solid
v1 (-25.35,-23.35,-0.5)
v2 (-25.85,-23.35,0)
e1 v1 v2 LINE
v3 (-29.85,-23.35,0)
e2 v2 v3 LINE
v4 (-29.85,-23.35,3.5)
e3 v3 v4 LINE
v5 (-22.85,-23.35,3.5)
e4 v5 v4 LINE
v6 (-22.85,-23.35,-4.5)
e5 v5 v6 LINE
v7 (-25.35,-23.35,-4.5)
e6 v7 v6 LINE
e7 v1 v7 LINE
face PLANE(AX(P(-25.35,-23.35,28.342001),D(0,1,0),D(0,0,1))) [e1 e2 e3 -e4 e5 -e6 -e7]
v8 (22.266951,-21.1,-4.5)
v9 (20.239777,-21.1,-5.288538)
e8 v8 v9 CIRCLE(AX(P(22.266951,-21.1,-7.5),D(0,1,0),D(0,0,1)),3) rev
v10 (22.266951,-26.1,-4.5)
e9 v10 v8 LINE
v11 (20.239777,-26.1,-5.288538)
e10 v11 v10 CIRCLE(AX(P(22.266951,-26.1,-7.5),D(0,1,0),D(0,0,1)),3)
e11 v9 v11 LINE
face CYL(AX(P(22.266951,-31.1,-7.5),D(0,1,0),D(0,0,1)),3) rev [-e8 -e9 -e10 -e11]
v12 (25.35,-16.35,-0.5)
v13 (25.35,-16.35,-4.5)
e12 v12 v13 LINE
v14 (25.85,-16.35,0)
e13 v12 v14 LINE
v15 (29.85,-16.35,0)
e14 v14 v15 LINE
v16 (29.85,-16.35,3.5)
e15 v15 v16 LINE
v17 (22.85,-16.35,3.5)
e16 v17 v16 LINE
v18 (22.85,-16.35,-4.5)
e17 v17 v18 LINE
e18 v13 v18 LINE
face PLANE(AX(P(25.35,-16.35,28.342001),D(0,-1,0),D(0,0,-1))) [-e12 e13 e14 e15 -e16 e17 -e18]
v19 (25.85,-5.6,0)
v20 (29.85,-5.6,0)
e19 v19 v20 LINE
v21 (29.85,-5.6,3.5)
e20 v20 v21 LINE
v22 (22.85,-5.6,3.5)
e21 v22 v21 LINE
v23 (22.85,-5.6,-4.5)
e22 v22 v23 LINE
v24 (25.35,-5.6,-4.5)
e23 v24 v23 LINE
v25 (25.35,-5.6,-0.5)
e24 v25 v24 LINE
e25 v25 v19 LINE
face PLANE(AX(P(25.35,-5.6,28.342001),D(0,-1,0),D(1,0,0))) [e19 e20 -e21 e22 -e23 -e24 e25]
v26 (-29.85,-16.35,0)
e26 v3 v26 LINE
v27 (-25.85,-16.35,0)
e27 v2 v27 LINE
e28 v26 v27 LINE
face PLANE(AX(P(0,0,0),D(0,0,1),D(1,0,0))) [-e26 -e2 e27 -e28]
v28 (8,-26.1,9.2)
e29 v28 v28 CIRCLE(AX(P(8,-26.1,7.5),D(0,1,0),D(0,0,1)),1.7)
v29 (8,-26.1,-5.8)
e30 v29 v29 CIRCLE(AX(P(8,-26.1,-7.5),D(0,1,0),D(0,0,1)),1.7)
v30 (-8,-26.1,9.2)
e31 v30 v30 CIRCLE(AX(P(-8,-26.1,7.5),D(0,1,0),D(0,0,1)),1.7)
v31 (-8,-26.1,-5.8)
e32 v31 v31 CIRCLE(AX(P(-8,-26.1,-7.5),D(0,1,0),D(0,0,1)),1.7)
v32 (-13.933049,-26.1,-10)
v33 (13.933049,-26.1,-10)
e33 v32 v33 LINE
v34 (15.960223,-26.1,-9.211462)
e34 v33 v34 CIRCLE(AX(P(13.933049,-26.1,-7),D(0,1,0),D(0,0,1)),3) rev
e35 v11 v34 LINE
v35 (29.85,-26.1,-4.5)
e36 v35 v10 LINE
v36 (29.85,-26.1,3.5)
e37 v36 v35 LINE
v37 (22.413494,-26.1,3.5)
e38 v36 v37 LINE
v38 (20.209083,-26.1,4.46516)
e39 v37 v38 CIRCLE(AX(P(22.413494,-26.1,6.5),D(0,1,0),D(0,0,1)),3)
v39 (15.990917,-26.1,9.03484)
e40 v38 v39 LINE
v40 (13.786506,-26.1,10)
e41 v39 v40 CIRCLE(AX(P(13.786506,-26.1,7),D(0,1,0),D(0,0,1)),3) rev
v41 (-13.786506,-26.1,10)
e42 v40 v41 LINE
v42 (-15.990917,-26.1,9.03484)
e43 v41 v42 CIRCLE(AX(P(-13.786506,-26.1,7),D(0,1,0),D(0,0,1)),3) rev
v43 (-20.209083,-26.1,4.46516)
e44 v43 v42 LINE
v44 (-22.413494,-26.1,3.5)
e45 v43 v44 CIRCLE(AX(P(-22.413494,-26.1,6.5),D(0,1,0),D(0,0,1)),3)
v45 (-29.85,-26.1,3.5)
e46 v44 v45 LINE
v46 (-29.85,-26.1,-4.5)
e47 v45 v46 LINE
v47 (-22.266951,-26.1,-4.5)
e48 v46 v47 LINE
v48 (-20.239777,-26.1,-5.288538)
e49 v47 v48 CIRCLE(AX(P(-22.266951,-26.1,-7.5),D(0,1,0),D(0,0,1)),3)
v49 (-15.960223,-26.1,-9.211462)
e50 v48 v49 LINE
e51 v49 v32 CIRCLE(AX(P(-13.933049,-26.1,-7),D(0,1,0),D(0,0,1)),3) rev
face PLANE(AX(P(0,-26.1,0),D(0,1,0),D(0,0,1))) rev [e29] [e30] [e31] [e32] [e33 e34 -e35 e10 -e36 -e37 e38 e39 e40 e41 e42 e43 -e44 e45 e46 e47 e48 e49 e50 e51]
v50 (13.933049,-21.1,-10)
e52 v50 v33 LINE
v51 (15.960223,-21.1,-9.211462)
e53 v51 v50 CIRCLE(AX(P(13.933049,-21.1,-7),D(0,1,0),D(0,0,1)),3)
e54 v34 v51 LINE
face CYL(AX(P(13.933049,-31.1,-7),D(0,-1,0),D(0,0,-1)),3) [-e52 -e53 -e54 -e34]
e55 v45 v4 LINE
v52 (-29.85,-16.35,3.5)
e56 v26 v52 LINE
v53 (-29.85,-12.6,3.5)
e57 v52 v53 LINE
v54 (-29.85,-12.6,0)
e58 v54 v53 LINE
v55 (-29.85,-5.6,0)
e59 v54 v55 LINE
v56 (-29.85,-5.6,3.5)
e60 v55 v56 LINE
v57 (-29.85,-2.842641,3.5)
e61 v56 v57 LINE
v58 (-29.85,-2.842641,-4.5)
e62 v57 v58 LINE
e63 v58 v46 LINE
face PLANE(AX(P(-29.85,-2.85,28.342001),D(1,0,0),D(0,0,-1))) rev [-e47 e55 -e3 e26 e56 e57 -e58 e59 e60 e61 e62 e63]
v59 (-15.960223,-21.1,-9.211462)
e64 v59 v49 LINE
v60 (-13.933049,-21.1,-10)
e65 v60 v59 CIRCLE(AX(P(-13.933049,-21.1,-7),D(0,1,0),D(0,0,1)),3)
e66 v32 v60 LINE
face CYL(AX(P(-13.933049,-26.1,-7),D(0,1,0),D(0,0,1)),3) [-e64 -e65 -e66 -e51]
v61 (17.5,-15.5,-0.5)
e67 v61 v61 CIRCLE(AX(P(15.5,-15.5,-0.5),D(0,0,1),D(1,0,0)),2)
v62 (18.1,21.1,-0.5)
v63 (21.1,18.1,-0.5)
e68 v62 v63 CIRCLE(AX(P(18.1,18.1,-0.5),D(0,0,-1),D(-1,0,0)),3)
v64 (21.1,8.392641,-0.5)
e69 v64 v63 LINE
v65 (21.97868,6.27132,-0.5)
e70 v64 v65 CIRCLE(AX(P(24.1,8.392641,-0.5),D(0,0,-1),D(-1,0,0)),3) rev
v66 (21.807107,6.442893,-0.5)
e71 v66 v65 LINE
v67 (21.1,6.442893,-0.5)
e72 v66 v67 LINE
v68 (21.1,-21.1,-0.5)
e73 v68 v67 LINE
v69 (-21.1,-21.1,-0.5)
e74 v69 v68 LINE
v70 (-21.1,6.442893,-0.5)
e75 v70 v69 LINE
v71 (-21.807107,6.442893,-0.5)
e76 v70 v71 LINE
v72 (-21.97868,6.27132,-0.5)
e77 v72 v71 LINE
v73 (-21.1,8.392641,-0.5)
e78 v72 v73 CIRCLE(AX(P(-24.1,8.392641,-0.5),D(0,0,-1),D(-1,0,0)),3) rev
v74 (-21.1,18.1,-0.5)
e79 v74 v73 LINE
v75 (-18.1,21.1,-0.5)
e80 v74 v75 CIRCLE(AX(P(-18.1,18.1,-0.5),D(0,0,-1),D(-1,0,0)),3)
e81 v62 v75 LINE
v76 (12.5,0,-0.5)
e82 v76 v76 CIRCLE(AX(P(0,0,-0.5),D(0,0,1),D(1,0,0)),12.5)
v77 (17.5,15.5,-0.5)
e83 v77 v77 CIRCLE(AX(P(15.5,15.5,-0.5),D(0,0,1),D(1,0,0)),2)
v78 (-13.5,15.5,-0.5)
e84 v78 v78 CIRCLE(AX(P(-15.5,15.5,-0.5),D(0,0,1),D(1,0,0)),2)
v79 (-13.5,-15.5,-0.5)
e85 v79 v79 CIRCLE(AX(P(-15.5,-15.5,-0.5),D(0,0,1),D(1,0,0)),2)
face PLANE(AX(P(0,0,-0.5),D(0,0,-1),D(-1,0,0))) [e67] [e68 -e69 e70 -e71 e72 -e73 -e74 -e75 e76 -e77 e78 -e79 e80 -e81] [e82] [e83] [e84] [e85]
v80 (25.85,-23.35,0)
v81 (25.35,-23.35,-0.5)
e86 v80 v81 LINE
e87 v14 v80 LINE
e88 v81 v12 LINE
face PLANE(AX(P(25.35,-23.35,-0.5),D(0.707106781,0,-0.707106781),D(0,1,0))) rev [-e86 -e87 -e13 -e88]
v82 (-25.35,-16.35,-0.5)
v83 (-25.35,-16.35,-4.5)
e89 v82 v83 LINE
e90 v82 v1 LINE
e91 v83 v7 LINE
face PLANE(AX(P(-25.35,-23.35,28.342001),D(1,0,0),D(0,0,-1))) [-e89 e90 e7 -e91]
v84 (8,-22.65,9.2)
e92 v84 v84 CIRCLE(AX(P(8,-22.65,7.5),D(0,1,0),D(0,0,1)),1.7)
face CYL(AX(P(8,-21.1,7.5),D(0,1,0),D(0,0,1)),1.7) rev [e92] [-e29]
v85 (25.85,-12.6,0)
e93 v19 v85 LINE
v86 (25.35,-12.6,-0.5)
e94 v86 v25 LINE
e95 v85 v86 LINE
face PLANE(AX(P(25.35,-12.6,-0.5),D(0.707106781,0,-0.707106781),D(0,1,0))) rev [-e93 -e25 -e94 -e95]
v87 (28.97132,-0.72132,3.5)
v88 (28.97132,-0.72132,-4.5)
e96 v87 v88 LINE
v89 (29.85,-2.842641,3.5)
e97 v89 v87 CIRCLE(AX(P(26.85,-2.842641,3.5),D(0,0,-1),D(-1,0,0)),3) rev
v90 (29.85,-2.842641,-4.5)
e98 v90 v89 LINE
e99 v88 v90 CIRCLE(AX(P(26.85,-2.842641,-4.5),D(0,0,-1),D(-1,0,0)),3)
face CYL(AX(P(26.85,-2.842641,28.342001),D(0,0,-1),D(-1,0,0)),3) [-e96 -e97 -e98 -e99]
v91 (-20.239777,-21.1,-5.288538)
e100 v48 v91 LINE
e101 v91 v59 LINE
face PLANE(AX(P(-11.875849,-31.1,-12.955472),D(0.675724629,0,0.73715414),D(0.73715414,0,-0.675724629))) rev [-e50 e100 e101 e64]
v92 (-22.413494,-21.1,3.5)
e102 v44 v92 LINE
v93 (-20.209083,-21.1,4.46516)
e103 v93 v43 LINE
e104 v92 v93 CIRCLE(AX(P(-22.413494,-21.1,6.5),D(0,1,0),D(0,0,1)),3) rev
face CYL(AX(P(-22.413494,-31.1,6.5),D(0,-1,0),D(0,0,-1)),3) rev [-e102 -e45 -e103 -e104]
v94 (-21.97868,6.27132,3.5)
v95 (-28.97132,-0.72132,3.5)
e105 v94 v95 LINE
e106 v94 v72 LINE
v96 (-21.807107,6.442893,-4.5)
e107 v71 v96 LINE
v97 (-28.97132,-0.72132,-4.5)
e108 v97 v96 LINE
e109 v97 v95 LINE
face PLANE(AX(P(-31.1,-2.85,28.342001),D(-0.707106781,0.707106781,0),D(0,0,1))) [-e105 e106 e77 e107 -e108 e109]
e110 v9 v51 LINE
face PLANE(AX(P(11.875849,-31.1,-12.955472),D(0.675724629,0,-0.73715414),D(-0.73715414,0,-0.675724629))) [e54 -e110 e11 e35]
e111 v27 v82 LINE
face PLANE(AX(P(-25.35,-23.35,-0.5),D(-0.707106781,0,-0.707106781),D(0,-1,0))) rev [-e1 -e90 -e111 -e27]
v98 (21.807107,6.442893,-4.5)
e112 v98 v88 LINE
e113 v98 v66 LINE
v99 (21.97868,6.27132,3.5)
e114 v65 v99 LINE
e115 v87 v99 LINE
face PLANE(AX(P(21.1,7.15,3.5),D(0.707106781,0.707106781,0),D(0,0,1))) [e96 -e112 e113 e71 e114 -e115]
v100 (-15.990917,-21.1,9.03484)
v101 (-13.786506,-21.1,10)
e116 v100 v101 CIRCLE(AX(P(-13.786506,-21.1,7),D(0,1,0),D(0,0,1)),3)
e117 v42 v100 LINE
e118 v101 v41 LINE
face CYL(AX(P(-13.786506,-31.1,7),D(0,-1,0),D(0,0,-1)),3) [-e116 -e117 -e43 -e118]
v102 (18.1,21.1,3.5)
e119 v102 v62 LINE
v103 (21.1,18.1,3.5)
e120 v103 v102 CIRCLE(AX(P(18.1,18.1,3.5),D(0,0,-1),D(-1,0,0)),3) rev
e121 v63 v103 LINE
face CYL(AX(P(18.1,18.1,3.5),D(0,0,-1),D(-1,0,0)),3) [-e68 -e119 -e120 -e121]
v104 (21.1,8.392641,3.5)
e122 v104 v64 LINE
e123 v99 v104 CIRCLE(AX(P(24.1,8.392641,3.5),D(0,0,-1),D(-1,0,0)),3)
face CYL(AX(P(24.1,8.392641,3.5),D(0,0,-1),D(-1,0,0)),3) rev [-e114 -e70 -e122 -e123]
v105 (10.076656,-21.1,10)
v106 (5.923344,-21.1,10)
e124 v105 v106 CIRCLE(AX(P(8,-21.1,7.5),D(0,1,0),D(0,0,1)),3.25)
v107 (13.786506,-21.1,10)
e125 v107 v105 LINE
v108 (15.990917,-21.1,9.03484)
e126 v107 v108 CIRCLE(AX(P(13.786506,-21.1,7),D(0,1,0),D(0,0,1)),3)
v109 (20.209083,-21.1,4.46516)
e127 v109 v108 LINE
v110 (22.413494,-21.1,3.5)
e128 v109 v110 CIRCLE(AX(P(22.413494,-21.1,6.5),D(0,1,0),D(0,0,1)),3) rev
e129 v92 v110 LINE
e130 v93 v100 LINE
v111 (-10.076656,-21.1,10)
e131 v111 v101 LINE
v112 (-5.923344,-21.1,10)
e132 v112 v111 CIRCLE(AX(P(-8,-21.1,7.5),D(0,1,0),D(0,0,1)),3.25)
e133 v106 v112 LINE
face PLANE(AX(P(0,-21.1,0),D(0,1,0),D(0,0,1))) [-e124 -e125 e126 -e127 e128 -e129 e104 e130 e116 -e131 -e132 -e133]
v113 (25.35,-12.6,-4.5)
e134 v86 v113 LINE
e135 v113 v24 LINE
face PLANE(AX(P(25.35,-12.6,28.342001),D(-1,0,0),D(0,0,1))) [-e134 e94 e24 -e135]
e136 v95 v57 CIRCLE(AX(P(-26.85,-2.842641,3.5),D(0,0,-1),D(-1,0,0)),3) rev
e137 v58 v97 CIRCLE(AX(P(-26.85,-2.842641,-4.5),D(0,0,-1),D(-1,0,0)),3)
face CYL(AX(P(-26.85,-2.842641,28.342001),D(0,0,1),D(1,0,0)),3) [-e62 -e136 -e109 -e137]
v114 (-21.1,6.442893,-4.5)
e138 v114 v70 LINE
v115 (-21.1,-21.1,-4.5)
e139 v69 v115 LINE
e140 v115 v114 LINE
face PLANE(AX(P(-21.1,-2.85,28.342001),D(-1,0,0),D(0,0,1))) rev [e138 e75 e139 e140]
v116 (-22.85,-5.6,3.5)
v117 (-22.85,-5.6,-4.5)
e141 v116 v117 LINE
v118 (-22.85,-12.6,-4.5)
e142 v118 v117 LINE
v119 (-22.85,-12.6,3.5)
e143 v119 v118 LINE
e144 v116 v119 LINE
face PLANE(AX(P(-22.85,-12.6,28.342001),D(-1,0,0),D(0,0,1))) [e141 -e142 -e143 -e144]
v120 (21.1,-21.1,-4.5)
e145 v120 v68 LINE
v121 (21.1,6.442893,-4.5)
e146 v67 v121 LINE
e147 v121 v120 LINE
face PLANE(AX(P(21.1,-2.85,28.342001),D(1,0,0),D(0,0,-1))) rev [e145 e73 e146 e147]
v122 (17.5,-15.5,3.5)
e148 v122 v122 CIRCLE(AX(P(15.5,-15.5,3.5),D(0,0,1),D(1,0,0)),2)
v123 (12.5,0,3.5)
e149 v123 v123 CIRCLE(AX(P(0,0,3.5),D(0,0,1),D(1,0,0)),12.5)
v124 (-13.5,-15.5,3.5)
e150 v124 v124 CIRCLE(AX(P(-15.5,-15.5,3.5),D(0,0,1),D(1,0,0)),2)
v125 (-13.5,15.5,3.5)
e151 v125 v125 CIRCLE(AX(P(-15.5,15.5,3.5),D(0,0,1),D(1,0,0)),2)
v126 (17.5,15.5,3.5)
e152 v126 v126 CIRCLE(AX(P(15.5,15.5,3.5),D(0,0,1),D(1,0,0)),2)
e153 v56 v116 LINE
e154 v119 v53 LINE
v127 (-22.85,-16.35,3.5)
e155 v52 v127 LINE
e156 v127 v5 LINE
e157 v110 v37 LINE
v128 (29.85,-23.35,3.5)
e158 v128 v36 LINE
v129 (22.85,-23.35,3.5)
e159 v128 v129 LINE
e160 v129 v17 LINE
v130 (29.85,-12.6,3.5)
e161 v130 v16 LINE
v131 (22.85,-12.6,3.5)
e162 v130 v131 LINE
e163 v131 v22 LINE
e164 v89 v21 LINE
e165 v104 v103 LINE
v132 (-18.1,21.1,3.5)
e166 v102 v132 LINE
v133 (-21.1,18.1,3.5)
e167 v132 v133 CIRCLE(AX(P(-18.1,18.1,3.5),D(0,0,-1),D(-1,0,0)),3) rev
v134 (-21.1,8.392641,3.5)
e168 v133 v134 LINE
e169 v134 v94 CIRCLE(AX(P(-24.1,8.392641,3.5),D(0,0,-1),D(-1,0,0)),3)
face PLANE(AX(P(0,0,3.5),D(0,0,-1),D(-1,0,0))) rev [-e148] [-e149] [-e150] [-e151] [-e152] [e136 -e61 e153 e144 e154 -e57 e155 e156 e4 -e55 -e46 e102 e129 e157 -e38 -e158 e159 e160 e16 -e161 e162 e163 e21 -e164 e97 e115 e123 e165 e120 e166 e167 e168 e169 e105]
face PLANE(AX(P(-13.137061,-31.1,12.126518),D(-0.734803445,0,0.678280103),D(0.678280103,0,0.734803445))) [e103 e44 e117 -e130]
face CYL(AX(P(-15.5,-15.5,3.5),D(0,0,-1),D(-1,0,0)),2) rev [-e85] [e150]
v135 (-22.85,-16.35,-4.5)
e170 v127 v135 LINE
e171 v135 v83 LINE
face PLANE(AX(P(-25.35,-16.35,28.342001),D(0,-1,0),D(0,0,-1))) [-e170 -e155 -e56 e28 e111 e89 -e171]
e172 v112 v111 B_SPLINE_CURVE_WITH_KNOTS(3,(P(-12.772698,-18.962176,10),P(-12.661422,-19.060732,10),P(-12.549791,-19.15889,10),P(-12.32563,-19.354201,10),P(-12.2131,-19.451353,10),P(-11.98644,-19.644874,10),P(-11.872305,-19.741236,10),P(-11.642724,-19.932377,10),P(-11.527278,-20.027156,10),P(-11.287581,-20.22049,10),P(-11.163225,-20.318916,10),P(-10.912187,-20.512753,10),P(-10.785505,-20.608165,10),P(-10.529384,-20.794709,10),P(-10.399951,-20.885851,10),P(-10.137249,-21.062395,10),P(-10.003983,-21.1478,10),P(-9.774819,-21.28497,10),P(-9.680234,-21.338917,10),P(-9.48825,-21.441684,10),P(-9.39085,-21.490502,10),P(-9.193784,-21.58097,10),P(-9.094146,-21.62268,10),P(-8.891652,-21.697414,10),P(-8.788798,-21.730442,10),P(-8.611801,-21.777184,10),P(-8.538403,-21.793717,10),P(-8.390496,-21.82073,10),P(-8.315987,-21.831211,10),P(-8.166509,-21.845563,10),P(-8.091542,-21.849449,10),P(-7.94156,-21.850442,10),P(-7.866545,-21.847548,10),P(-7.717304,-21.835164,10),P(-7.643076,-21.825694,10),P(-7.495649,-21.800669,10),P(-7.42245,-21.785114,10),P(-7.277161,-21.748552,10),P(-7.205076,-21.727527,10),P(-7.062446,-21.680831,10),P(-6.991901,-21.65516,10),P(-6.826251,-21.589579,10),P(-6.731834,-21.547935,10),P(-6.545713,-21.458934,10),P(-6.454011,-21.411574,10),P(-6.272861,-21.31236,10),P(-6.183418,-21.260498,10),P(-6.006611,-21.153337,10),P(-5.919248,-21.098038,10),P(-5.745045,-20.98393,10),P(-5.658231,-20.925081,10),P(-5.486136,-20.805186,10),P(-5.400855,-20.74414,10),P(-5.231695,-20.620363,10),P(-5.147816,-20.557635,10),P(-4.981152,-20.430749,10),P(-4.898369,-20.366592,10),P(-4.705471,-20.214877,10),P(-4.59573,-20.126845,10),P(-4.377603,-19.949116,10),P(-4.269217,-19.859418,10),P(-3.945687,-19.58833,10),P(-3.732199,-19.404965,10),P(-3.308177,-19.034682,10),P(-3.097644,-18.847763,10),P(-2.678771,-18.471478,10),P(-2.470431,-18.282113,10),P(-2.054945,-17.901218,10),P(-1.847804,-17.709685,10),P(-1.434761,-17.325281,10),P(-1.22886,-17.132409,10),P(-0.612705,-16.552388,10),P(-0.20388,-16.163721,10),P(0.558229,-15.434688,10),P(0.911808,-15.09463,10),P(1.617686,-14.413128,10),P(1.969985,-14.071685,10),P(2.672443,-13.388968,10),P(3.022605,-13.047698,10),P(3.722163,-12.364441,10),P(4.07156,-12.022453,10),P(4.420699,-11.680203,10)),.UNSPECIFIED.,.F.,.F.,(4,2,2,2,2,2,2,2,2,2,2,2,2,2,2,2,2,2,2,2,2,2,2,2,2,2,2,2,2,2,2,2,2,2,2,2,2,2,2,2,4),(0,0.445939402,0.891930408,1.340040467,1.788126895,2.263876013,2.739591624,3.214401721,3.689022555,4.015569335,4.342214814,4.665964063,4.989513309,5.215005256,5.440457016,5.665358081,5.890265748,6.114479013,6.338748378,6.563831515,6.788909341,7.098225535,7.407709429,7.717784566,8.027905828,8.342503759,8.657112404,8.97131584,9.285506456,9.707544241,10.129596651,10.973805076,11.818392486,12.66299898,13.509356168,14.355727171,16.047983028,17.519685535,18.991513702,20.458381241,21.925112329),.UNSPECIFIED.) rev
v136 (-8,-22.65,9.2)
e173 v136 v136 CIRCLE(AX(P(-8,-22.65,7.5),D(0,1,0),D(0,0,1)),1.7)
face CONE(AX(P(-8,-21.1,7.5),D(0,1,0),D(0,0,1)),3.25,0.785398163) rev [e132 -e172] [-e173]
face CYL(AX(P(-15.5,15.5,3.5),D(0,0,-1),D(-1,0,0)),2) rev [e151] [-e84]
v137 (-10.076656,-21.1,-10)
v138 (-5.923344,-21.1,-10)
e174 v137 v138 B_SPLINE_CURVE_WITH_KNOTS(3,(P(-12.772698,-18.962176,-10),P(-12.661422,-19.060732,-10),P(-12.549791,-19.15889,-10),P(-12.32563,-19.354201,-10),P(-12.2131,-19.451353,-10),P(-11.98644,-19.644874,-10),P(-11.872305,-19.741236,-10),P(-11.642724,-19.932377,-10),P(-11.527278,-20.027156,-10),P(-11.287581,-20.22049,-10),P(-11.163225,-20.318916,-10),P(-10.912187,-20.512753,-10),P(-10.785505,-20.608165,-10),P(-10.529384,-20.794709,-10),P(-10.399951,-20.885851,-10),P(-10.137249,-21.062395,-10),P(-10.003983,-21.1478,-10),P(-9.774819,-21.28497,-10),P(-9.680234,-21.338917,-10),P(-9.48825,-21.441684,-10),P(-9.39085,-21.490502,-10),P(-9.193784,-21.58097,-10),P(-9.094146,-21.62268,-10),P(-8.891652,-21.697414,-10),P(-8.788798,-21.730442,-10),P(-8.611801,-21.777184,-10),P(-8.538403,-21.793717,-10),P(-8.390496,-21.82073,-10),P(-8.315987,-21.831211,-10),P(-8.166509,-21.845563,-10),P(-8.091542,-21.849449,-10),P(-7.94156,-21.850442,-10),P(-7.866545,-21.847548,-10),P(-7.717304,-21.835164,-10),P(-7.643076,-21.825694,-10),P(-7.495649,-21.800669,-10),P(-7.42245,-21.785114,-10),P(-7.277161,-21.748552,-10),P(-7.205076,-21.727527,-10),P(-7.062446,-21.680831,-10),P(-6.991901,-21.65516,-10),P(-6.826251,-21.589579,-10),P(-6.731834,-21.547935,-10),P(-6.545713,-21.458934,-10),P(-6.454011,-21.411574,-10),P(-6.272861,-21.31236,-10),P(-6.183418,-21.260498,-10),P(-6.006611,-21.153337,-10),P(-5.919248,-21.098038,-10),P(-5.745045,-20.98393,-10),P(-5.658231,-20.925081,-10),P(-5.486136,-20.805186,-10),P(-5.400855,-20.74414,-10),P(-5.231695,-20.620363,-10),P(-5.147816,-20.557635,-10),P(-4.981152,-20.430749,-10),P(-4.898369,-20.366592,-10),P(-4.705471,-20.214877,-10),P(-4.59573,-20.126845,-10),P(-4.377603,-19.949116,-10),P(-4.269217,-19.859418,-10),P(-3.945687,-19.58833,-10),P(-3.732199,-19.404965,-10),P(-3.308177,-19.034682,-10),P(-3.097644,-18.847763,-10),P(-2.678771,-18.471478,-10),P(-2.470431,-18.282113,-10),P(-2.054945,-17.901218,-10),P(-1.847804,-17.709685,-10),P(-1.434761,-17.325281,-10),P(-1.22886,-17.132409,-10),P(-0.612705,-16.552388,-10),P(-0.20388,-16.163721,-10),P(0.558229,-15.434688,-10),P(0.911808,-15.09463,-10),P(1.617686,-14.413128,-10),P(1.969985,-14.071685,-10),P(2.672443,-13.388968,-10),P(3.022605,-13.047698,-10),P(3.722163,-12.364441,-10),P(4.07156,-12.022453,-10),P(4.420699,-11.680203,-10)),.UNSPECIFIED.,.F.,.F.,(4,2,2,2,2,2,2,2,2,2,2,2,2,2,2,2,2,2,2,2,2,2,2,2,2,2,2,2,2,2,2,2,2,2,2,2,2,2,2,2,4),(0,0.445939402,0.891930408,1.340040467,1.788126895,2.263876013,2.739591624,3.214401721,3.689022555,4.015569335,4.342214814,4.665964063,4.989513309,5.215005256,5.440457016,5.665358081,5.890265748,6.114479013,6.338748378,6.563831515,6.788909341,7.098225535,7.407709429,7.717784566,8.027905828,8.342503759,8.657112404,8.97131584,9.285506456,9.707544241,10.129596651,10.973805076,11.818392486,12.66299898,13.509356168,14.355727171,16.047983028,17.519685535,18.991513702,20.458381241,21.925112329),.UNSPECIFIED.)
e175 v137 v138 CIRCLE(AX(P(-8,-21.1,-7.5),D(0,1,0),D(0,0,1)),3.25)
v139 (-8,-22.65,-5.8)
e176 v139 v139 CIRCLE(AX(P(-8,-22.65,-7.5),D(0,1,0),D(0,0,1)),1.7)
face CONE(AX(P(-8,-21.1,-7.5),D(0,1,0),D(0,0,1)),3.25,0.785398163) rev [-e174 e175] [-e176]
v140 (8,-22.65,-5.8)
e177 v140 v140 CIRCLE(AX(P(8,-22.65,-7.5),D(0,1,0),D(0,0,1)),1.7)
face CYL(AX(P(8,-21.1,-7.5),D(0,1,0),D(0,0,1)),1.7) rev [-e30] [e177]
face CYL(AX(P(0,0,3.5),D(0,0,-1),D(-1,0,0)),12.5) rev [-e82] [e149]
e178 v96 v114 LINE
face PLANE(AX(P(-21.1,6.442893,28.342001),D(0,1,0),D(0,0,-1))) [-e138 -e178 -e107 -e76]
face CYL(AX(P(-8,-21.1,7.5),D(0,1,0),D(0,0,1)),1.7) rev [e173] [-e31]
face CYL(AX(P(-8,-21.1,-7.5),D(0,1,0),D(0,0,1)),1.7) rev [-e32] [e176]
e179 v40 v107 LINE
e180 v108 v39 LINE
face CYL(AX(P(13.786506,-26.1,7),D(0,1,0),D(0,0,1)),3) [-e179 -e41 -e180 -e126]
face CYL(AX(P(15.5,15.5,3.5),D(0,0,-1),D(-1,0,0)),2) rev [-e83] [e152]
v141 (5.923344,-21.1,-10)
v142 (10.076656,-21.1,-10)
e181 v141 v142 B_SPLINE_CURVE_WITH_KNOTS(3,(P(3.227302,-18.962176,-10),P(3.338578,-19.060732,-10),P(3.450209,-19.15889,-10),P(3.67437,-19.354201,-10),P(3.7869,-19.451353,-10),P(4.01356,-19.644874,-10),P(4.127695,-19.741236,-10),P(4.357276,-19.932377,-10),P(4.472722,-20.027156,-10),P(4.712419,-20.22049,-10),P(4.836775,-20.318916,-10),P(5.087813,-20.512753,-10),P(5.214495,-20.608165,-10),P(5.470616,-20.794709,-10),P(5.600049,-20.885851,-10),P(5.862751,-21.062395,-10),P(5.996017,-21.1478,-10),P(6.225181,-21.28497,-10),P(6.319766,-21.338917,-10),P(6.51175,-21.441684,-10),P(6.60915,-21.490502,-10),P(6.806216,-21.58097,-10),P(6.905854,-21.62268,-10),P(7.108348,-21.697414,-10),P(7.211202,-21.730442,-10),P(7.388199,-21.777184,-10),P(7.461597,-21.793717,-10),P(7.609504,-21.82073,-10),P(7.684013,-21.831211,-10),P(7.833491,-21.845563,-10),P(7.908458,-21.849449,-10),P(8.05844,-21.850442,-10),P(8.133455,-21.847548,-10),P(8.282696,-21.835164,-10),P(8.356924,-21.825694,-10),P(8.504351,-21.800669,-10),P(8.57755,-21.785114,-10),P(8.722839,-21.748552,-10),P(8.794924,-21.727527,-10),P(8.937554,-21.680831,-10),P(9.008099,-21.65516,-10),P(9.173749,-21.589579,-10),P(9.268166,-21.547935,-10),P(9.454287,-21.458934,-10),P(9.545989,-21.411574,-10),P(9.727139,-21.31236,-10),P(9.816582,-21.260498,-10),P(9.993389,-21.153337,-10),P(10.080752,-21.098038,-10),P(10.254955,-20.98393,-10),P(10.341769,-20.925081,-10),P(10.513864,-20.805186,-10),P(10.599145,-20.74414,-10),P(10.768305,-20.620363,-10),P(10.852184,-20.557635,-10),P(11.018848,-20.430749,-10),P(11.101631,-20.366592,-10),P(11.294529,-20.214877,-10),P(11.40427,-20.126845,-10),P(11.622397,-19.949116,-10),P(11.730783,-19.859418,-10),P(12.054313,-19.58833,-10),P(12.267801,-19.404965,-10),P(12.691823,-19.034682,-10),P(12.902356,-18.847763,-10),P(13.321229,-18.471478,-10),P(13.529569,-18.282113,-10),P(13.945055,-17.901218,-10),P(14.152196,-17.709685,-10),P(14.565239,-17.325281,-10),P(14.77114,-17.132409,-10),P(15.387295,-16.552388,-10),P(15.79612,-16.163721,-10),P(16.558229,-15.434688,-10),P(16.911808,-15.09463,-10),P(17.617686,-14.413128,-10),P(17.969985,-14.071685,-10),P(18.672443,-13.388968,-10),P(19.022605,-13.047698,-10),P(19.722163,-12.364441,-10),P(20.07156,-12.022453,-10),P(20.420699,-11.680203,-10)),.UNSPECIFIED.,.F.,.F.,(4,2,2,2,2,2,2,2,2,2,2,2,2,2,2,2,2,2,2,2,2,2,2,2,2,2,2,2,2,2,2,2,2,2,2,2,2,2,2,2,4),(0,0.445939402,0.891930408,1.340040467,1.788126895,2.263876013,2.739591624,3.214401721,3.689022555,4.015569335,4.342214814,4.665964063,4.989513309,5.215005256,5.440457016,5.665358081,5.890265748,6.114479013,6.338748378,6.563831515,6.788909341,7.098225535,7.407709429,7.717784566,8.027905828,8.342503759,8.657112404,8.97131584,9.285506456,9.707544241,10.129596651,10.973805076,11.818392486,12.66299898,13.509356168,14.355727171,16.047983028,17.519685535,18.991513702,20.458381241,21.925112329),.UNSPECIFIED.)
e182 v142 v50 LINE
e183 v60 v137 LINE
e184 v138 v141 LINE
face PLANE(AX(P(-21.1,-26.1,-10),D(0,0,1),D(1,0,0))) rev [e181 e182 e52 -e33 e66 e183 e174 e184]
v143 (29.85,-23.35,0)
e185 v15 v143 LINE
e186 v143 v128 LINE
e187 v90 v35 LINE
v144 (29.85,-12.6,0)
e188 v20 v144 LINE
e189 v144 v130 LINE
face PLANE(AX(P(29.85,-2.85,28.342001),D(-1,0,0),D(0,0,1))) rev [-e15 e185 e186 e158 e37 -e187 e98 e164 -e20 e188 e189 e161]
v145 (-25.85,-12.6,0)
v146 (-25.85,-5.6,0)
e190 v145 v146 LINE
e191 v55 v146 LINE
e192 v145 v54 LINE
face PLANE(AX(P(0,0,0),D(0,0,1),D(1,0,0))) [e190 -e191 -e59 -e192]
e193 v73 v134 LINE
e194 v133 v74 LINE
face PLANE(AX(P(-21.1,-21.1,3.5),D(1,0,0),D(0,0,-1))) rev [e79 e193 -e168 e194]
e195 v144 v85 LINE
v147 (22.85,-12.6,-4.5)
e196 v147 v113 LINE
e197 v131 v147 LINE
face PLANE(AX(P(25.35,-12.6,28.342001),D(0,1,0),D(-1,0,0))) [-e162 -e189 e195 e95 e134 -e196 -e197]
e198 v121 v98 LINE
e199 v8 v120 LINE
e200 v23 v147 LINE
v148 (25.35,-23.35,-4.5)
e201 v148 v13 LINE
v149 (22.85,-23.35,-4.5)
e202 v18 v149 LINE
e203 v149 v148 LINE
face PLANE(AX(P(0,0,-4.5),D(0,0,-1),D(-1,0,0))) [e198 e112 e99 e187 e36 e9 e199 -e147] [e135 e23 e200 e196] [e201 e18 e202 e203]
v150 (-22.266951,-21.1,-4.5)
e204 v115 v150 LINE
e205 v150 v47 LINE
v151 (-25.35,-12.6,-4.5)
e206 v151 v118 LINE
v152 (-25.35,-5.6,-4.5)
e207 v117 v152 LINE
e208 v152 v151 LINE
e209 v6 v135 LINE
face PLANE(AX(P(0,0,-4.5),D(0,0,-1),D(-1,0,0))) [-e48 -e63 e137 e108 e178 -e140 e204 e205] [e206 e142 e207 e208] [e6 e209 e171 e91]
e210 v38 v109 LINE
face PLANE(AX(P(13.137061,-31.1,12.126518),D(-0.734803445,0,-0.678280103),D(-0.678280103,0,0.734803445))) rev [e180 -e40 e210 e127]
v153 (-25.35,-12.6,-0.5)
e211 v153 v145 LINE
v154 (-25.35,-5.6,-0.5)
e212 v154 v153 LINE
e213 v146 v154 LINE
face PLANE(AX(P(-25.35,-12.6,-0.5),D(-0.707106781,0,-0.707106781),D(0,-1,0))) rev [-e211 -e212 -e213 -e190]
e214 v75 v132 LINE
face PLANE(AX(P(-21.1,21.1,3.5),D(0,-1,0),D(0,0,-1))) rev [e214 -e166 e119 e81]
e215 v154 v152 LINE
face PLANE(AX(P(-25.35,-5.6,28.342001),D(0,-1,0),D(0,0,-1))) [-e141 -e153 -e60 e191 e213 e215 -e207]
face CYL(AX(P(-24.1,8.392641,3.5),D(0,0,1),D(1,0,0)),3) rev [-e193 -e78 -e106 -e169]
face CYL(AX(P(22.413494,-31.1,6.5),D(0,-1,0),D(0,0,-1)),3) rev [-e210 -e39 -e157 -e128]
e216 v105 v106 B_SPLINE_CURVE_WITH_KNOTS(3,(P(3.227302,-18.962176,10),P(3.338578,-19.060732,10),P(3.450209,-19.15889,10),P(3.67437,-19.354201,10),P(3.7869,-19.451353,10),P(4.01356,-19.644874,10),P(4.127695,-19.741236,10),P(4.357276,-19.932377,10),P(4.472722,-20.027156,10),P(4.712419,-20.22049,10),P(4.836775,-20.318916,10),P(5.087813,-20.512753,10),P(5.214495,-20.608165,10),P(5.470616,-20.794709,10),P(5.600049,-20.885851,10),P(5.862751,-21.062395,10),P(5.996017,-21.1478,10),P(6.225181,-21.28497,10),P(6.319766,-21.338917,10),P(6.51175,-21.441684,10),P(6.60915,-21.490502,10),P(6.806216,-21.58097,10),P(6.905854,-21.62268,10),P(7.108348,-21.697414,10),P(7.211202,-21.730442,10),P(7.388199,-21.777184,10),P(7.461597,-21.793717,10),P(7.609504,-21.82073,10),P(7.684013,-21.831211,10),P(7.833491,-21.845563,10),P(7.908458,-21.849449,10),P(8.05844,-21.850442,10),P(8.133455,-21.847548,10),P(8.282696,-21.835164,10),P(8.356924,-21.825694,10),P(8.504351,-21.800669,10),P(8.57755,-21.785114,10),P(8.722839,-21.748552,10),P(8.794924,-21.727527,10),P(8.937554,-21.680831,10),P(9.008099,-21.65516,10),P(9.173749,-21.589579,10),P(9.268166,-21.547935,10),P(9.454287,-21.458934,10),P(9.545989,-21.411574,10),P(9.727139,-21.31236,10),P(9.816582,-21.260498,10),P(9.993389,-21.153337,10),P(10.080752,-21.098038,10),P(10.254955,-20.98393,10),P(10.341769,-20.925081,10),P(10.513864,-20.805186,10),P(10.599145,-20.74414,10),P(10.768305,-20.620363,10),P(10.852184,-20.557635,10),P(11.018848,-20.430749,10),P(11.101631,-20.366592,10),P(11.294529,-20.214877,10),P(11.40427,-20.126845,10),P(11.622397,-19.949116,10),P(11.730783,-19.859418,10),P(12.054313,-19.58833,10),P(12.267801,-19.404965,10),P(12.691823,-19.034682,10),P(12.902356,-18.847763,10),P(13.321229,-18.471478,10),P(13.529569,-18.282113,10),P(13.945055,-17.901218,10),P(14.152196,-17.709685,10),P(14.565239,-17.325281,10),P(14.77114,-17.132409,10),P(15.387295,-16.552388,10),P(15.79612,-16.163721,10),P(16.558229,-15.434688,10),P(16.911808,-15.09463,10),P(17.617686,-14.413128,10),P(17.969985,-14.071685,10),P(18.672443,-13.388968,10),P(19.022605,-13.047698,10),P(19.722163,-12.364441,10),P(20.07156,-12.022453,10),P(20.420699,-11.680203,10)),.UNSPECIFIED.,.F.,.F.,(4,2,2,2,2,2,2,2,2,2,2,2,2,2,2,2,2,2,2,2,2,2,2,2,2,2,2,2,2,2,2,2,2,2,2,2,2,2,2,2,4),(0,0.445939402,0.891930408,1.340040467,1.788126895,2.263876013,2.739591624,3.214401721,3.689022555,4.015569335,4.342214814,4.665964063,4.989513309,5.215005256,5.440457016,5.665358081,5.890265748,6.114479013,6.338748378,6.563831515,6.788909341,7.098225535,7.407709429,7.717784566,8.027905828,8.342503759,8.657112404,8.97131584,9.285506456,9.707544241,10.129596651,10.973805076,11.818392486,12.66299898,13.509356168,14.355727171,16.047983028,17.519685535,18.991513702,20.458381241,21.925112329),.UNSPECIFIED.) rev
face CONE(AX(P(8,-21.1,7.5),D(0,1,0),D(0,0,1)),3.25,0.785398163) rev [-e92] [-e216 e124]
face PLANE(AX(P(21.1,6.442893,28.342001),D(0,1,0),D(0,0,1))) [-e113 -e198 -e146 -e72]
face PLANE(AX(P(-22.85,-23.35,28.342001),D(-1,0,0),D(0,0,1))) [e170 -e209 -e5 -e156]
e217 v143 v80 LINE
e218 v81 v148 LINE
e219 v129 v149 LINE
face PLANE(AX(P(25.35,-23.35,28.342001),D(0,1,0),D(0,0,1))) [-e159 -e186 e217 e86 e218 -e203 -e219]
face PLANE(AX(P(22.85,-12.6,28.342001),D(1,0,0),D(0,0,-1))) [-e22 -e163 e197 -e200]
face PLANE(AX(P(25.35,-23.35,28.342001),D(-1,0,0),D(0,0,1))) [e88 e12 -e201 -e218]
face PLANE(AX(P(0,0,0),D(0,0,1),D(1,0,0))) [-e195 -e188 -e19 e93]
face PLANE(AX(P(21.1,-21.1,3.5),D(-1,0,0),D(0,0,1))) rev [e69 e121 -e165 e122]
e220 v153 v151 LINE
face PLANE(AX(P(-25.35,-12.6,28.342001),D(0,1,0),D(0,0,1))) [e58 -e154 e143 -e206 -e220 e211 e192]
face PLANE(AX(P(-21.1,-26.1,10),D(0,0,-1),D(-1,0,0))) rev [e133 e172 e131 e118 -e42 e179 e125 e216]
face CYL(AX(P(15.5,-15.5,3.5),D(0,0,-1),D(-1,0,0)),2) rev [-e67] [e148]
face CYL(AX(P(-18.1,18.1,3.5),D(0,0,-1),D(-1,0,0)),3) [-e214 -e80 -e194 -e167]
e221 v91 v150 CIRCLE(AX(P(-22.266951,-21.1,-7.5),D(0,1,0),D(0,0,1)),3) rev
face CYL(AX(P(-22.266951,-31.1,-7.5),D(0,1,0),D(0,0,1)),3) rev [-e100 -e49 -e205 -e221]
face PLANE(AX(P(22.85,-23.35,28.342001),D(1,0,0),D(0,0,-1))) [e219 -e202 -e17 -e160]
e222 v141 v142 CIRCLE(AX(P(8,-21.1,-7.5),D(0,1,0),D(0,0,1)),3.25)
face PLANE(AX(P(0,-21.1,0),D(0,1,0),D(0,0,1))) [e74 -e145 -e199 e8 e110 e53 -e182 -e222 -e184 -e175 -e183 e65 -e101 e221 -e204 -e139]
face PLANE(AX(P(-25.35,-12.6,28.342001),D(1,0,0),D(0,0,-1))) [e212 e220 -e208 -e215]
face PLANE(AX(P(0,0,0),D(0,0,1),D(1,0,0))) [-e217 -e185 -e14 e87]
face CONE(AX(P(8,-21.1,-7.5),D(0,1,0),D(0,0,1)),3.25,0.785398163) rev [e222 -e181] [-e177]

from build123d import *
from OCP.BRepFilletAPI import BRepFilletAPI_MakeChamfer

# Parameters (mm, degrees)
SKETCH1_W                                       = 42.2
SKETCH1_H                                       = 42.2
SKETCH1_R                                       = 12.5
SKETCH1_R_2                                     = 2
BOSS_EXTRUDE1_DEPTH                             = 2
SKETCH2_W                                       = 42.2
SKETCH2_H                                       = 20
SKETCH2_R                                       = 1.625
BOSS_EXTRUDE2_DEPTH                             = 5
BOSS_EXTRUDE3_DEPTH                             = 3.5
BOSS_EXTRUDE3_DEPTH_BACK                        = 2
SKETCH3_W                                       = 8.75
SKETCH3_H                                       = 23.25
SKETCH3_W_2                                     = 2.5
SKETCH3_H_2                                     = 7
CUT_EXTRUDE1_START                              = -3.5
SKETCH4_W                                       = 4.5
SKETCH4_H                                       = 7
CUT_EXTRUDE1_DEPTH                              = 3.5
CSK_FOR_M3_FLAT_HEAD_MACHINE_SCREW1_D           = 3.4
CSK_FOR_M3_FLAT_HEAD_MACHINE_SCREW1_CSINK_D     = 6.5
CSK_FOR_M3_FLAT_HEAD_MACHINE_SCREW1_CSINK_ANGLE = 90
SKETCH10_W                                      = 8.75
SKETCH10_H                                      = 23.25
SKETCH10_W_2                                    = 2.5
SKETCH10_H_2                                    = 7
BOSS_EXTRUDE4_DEPTH                             = 4
CUT_EXTRUDE3_DEPTH                              = 10
CHAMFER1_SIZE                                   = 10
FILLET2_R                                       = 3
FILLET3_R                                       = 3
FILLET4_R                                       = 3
CHAMFER2_SIZE                                   = 1
CHAMFER2_SIZE2                                  = 0.707106781
CHAMFER3_SIZE                                   = 0.5


with BuildPart() as part:
    # Sketch1 → Boss-Extrude1 (new, symmetric)
    with BuildSketch(Plane.XY.offset(1.5)):
        Rectangle(SKETCH1_W, SKETCH1_H)
        Circle(SKETCH1_R, mode=Mode.SUBTRACT)
        with Locations((15.5, 15.5)):
            Circle(SKETCH1_R_2, mode=Mode.SUBTRACT)
        with Locations((15.5, -15.5)):
            Circle(SKETCH1_R_2, mode=Mode.SUBTRACT)
        with Locations((-15.5, -15.5)):
            Circle(SKETCH1_R_2, mode=Mode.SUBTRACT)
        with Locations((-15.5, 15.5)):
            Circle(SKETCH1_R_2, mode=Mode.SUBTRACT)
    extrude(amount=BOSS_EXTRUDE1_DEPTH, both=True)

    # Sketch2 → Boss-Extrude2 (add)
    with BuildSketch(Plane.XZ.offset(21.1)):
        Rectangle(SKETCH2_W, SKETCH2_H)
        with Locations(Location((8, 7.5, 0), (0, 0, 270))):
            Circle(SKETCH2_R, mode=Mode.SUBTRACT)
        with Locations(Location((8, -7.5, 0), (0, 0, 270))):
            Circle(SKETCH2_R, mode=Mode.SUBTRACT)
        with Locations(Location((-8, -7.5, 0), (0, 0, 270))):
            Circle(SKETCH2_R, mode=Mode.SUBTRACT)
        with Locations(Location((-8, 7.5, 0), (0, 0, 270))):
            Circle(SKETCH2_R, mode=Mode.SUBTRACT)
    extrude(amount=BOSS_EXTRUDE2_DEPTH)

    # Sketch3 → Boss-Extrude3 (add, two sides: drawn at the far end of the back side and taken through both)
    # profile 1 of 2: a face of its own
    with BuildSketch(Plane.XY.offset(-BOSS_EXTRUDE3_DEPTH_BACK)):
        with Locations((-25.475, -14.475)):
            Rectangle(SKETCH3_W, SKETCH3_H)
        with Locations((-24.1, -9.1)):
            Rectangle(SKETCH3_W_2, SKETCH3_H_2, mode=Mode.SUBTRACT)
        with Locations((-24.1, -19.85)):
            Rectangle(SKETCH3_W_2, SKETCH3_H_2, mode=Mode.SUBTRACT)
    # profile 2 of 2: a face of its own
    with BuildSketch(Plane.XY.offset(-BOSS_EXTRUDE3_DEPTH_BACK)):
        with Locations((25.475, -14.475)):
            Rectangle(SKETCH3_W, SKETCH3_H)
        with Locations((24.1, -9.1)):
            Rectangle(SKETCH3_W_2, SKETCH3_H_2, mode=Mode.SUBTRACT)
        with Locations((24.1, -19.85)):
            Rectangle(SKETCH3_W_2, SKETCH3_H_2, mode=Mode.SUBTRACT)
    extrude(amount=BOSS_EXTRUDE3_DEPTH + BOSS_EXTRUDE3_DEPTH_BACK)

    # Sketch4 → Cut-Extrude1 (cut)
    with BuildSketch(Plane.XY.offset(3.5).offset(CUT_EXTRUDE1_START)):
        with Locations((-27.6, -9.1)):
            Rectangle(SKETCH4_W, SKETCH4_H)
        with Locations((-27.6, -19.85)):
            Rectangle(SKETCH4_W, SKETCH4_H)
        with Locations((27.6, -19.85)):
            Rectangle(SKETCH4_W, SKETCH4_H)
        with Locations((27.6, -9.1)):
            Rectangle(SKETCH4_W, SKETCH4_H)
    extrude(amount=CUT_EXTRUDE1_DEPTH, mode=Mode.SUBTRACT)

    # CSK for M3 Flat Head Machine Screw1 (through all)
    with Locations(Plane(origin=(0, -21.1, 0), x_dir=(1, 0, 0), z_dir=(0, 1, 0))):
        with Locations((-8, -7.5), (8, -7.5), (-8, 7.5), (8, 7.5)):
            CounterSinkHole(CSK_FOR_M3_FLAT_HEAD_MACHINE_SCREW1_D / 2, CSK_FOR_M3_FLAT_HEAD_MACHINE_SCREW1_CSINK_D / 2, counter_sink_angle=CSK_FOR_M3_FLAT_HEAD_MACHINE_SCREW1_CSINK_ANGLE)

    # Sketch10 → Boss-Extrude4 (add)
    # profile 1 of 2: a face of its own
    with BuildSketch(Plane(origin=(0, 0, -0.5), x_dir=(-1, 0, 0), z_dir=(0, 0, -1))):
        with Locations((25.475, -14.475)):
            Rectangle(SKETCH10_W, SKETCH10_H)
        with Locations((24.1, -19.85)):
            Rectangle(SKETCH10_W_2, SKETCH10_H_2, mode=Mode.SUBTRACT)
        with Locations((24.1, -9.1)):
            Rectangle(SKETCH10_W_2, SKETCH10_H_2, mode=Mode.SUBTRACT)
    # profile 2 of 2: a face of its own
    with BuildSketch(Plane(origin=(0, 0, -0.5), x_dir=(-1, 0, 0), z_dir=(0, 0, -1))):
        with Locations((-25.475, -14.475)):
            Rectangle(SKETCH10_W, SKETCH10_H)
        with Locations((-24.1, -19.85)):
            Rectangle(SKETCH10_W_2, SKETCH10_H_2, mode=Mode.SUBTRACT)
        with Locations((-24.1, -9.1)):
            Rectangle(SKETCH10_W_2, SKETCH10_H_2, mode=Mode.SUBTRACT)
    extrude(amount=BOSS_EXTRUDE4_DEPTH)

    # Sketch11 → Cut-Extrude3 (cut)
    with BuildSketch(Plane(origin=(0, -21.1, 0), x_dir=(1, 0, 0), z_dir=(0, 1, 0))):
        Polygon((-21.1, -3.5), (-15.1, -10), (-21.1, -10), align=None)
        Polygon((15.1, -10), (21.1, -10), (21.1, -3.5), align=None)
        Polygon((-21.1, 10), (-21.1, 4.5), (-15.1, 10), align=None)
        Polygon((21.1, 4.5), (21.1, 10), (15.1, 10), align=None)
    extrude(amount=-CUT_EXTRUDE3_DEPTH, mode=Mode.SUBTRACT)

    # Chamfer1
    # the kernel refuses this chamfer: 10 mm, written as the material it adds along each edge
    with BuildSketch(Plane(origin=(-21.1, -2.85, 3.5), x_dir=(0.027495876610585973, 0.9996219169112968, 0), z_dir=(0, 0, -1))) as chamfer1_piece_1_section:
        Polygon((CHAMFER1_SIZE * 0.999621916911, -CHAMFER1_SIZE * 0.0274958766106), (-CHAMFER1_SIZE * 0.0274958766106, -CHAMFER1_SIZE * 0.999621916911), (0, 0), align=None)
    chamfer1_piece_1 = extrude(amount=4, mode=Mode.PRIVATE)
    chamfer1_piece_1 = split(chamfer1_piece_1, bisect_by=Plane(origin=(-21.1, 0.400261982, 1.5), z_dir=(-1, 0, 0)), keep=Keep.TOP, mode=Mode.PRIVATE)
    chamfer1_piece_1 = split(chamfer1_piece_1, bisect_by=Plane(origin=(-29.85, 0.400261982, 1.5), z_dir=(1, 0, 0)), keep=Keep.TOP, mode=Mode.PRIVATE)
    add(chamfer1_piece_1)
    with BuildSketch(Plane(origin=(-21.1, -2.85, 3.5), x_dir=(0.027495876610585973, 0.9996219169112968, 0), z_dir=(0, 0, -1))) as chamfer1_piece_2_section:
        Polygon((CHAMFER1_SIZE * 0.999621916911, -CHAMFER1_SIZE * 0.0274958766106), (-CHAMFER1_SIZE * 0.0274958766106, -CHAMFER1_SIZE * 0.999621916911), (0, 0), align=None)
    chamfer1_piece_2 = extrude(amount=29.71682988, mode=Mode.PRIVATE)
    chamfer1_piece_2 = split(chamfer1_piece_2, bisect_by=Plane(origin=(-24.403786138, 0.400261982, -0.5), z_dir=(0, 0, -1)), keep=Keep.TOP, mode=Mode.PRIVATE)
    chamfer1_piece_2 = split(chamfer1_piece_2, bisect_by=Plane(origin=(-21.1, 0.400261982, -2.5), z_dir=(-1, 0, 0)), keep=Keep.TOP, mode=Mode.PRIVATE)
    chamfer1_piece_2 = split(chamfer1_piece_2, bisect_by=Plane(origin=(-24.403786138, 0.400261982, -4.5), z_dir=(0, 0, 1)), keep=Keep.TOP, mode=Mode.PRIVATE)
    chamfer1_piece_2 = split(chamfer1_piece_2, bisect_by=Plane(origin=(-29.85, 0.400261982, -2.5), z_dir=(1, 0, 0)), keep=Keep.TOP, mode=Mode.PRIVATE)
    add(chamfer1_piece_2)
    with BuildSketch(Plane(origin=(21.1, -2.85, 3.5), x_dir=(-0.027495876610585973, 0.9996219169112968, 0), z_dir=(0, 0, -1))) as chamfer1_piece_3_section:
        Polygon((CHAMFER1_SIZE * 0.999621916911, CHAMFER1_SIZE * 0.0274958766106), (-CHAMFER1_SIZE * 0.0274958766106, CHAMFER1_SIZE * 0.999621916911), (0, 0), align=None)
    chamfer1_piece_3 = extrude(amount=4, mode=Mode.PRIVATE)
    chamfer1_piece_3 = split(chamfer1_piece_3, bisect_by=Plane(origin=(21.1, 0.400261982, 1.5), z_dir=(1, 0, 0)), keep=Keep.TOP, mode=Mode.PRIVATE)
    chamfer1_piece_3 = split(chamfer1_piece_3, bisect_by=Plane(origin=(29.85, 0.400261982, 1.5), z_dir=(-1, 0, 0)), keep=Keep.TOP, mode=Mode.PRIVATE)
    add(chamfer1_piece_3)
    with BuildSketch(Plane(origin=(21.1, -2.85, 3.5), x_dir=(-0.027495876610585973, 0.9996219169112968, 0), z_dir=(0, 0, -1))) as chamfer1_piece_4_section:
        Polygon((CHAMFER1_SIZE * 0.999621916911, CHAMFER1_SIZE * 0.0274958766106), (-CHAMFER1_SIZE * 0.0274958766106, CHAMFER1_SIZE * 0.999621916911), (0, 0), align=None)
    chamfer1_piece_4 = extrude(amount=29.71682988, mode=Mode.PRIVATE)
    chamfer1_piece_4 = split(chamfer1_piece_4, bisect_by=Plane(origin=(24.403786138, 0.400261982, -0.5), z_dir=(0, 0, -1)), keep=Keep.TOP, mode=Mode.PRIVATE)
    chamfer1_piece_4 = split(chamfer1_piece_4, bisect_by=Plane(origin=(21.1, 0.400261982, -2.5), z_dir=(1, 0, 0)), keep=Keep.TOP, mode=Mode.PRIVATE)
    chamfer1_piece_4 = split(chamfer1_piece_4, bisect_by=Plane(origin=(24.403786138, 0.400261982, -4.5), z_dir=(0, 0, 1)), keep=Keep.TOP, mode=Mode.PRIVATE)
    chamfer1_piece_4 = split(chamfer1_piece_4, bisect_by=Plane(origin=(29.85, 0.400261982, -2.5), z_dir=(-1, 0, 0)), keep=Keep.TOP, mode=Mode.PRIVATE)
    add(chamfer1_piece_4)

    # Fillet2
    fillet2_edges = [part.edges().sort_by_distance(p)[0] for p in [
        (21.1, 7.15, 1.5),
        (-21.1, 7.15, 1.5),
        (29.85, -1.6, -0.5),
        (-29.85, -1.6, -0.5),
    ]]
    fillet(fillet2_edges, radius=FILLET2_R)

    # Fillet3
    fillet3_edges = [part.edges().sort_by_distance(p)[0] for p in [
        (-21.1, 21.1, 1.5),
        (21.1, 21.1, 1.5),
    ]]
    fillet(fillet3_edges, radius=FILLET3_R)

    # Fillet4
    fillet4_edges = [part.edges().sort_by_distance(p)[0] for p in [
        (21.1, -23.6, -4.5),
        (-21.1, -23.6, -4.5),
        (-15.1, -23.6, 10),
        (15.1, -23.6, 10),
        (-15.1, -23.6, -10),
        (15.1, -23.6, -10),
        (-21.1, -23.6, 3.5),
        (21.1, -23.6, 3.5),
    ]]
    fillet(fillet4_edges, radius=FILLET4_R)

    # Chamfer2: one chamfer whose edges measure the first distance from different faces: ONE call of the kernel's chamfer builder (chamfer() names one face for all edges)
    chamfer2_edges_1 = [part.edges().sort_by_distance(p)[0] for p in [
        (21.1, 7.15, -2.5),
    ]]
    chamfer2_side_1 = [part.faces().sort_by_distance(p)[0] for p in [
        (25.242344349, 3.007655651, -0.618229543),
    ]]
    chamfer2_edges_2 = [part.edges().sort_by_distance(p)[0] for p in [
        (-21.1, 7.15, -2.5),
    ]]
    chamfer2_side_2 = [part.faces().sort_by_distance(p)[0] for p in [
        (-25.242344349, 3.007655651, -0.618229543),
    ]]
    chamfer2 = BRepFilletAPI_MakeChamfer(part.part.solid().wrapped)
    for e in chamfer2_edges_1:
        chamfer2.Add(CHAMFER2_SIZE, CHAMFER2_SIZE2, e.wrapped, chamfer2_side_1[0].wrapped)  # the first distance lies on this face
    for e in chamfer2_edges_2:
        chamfer2.Add(CHAMFER2_SIZE, CHAMFER2_SIZE2, e.wrapped, chamfer2_side_2[0].wrapped)  # the first distance lies on this face
    add(Compound.cast(chamfer2.Shape()), mode=Mode.REPLACE)

    # Chamfer3
    chamfer3_edges = [part.edges().sort_by_distance(p)[0] for p in [
        (25.35, -9.1, 0),
        (25.35, -19.85, 0),
        (-25.35, -19.85, 0),
        (-25.35, -9.1, 0),
    ]]
    chamfer(chamfer3_edges, length=CHAMFER3_SIZE)


solid = part.part
